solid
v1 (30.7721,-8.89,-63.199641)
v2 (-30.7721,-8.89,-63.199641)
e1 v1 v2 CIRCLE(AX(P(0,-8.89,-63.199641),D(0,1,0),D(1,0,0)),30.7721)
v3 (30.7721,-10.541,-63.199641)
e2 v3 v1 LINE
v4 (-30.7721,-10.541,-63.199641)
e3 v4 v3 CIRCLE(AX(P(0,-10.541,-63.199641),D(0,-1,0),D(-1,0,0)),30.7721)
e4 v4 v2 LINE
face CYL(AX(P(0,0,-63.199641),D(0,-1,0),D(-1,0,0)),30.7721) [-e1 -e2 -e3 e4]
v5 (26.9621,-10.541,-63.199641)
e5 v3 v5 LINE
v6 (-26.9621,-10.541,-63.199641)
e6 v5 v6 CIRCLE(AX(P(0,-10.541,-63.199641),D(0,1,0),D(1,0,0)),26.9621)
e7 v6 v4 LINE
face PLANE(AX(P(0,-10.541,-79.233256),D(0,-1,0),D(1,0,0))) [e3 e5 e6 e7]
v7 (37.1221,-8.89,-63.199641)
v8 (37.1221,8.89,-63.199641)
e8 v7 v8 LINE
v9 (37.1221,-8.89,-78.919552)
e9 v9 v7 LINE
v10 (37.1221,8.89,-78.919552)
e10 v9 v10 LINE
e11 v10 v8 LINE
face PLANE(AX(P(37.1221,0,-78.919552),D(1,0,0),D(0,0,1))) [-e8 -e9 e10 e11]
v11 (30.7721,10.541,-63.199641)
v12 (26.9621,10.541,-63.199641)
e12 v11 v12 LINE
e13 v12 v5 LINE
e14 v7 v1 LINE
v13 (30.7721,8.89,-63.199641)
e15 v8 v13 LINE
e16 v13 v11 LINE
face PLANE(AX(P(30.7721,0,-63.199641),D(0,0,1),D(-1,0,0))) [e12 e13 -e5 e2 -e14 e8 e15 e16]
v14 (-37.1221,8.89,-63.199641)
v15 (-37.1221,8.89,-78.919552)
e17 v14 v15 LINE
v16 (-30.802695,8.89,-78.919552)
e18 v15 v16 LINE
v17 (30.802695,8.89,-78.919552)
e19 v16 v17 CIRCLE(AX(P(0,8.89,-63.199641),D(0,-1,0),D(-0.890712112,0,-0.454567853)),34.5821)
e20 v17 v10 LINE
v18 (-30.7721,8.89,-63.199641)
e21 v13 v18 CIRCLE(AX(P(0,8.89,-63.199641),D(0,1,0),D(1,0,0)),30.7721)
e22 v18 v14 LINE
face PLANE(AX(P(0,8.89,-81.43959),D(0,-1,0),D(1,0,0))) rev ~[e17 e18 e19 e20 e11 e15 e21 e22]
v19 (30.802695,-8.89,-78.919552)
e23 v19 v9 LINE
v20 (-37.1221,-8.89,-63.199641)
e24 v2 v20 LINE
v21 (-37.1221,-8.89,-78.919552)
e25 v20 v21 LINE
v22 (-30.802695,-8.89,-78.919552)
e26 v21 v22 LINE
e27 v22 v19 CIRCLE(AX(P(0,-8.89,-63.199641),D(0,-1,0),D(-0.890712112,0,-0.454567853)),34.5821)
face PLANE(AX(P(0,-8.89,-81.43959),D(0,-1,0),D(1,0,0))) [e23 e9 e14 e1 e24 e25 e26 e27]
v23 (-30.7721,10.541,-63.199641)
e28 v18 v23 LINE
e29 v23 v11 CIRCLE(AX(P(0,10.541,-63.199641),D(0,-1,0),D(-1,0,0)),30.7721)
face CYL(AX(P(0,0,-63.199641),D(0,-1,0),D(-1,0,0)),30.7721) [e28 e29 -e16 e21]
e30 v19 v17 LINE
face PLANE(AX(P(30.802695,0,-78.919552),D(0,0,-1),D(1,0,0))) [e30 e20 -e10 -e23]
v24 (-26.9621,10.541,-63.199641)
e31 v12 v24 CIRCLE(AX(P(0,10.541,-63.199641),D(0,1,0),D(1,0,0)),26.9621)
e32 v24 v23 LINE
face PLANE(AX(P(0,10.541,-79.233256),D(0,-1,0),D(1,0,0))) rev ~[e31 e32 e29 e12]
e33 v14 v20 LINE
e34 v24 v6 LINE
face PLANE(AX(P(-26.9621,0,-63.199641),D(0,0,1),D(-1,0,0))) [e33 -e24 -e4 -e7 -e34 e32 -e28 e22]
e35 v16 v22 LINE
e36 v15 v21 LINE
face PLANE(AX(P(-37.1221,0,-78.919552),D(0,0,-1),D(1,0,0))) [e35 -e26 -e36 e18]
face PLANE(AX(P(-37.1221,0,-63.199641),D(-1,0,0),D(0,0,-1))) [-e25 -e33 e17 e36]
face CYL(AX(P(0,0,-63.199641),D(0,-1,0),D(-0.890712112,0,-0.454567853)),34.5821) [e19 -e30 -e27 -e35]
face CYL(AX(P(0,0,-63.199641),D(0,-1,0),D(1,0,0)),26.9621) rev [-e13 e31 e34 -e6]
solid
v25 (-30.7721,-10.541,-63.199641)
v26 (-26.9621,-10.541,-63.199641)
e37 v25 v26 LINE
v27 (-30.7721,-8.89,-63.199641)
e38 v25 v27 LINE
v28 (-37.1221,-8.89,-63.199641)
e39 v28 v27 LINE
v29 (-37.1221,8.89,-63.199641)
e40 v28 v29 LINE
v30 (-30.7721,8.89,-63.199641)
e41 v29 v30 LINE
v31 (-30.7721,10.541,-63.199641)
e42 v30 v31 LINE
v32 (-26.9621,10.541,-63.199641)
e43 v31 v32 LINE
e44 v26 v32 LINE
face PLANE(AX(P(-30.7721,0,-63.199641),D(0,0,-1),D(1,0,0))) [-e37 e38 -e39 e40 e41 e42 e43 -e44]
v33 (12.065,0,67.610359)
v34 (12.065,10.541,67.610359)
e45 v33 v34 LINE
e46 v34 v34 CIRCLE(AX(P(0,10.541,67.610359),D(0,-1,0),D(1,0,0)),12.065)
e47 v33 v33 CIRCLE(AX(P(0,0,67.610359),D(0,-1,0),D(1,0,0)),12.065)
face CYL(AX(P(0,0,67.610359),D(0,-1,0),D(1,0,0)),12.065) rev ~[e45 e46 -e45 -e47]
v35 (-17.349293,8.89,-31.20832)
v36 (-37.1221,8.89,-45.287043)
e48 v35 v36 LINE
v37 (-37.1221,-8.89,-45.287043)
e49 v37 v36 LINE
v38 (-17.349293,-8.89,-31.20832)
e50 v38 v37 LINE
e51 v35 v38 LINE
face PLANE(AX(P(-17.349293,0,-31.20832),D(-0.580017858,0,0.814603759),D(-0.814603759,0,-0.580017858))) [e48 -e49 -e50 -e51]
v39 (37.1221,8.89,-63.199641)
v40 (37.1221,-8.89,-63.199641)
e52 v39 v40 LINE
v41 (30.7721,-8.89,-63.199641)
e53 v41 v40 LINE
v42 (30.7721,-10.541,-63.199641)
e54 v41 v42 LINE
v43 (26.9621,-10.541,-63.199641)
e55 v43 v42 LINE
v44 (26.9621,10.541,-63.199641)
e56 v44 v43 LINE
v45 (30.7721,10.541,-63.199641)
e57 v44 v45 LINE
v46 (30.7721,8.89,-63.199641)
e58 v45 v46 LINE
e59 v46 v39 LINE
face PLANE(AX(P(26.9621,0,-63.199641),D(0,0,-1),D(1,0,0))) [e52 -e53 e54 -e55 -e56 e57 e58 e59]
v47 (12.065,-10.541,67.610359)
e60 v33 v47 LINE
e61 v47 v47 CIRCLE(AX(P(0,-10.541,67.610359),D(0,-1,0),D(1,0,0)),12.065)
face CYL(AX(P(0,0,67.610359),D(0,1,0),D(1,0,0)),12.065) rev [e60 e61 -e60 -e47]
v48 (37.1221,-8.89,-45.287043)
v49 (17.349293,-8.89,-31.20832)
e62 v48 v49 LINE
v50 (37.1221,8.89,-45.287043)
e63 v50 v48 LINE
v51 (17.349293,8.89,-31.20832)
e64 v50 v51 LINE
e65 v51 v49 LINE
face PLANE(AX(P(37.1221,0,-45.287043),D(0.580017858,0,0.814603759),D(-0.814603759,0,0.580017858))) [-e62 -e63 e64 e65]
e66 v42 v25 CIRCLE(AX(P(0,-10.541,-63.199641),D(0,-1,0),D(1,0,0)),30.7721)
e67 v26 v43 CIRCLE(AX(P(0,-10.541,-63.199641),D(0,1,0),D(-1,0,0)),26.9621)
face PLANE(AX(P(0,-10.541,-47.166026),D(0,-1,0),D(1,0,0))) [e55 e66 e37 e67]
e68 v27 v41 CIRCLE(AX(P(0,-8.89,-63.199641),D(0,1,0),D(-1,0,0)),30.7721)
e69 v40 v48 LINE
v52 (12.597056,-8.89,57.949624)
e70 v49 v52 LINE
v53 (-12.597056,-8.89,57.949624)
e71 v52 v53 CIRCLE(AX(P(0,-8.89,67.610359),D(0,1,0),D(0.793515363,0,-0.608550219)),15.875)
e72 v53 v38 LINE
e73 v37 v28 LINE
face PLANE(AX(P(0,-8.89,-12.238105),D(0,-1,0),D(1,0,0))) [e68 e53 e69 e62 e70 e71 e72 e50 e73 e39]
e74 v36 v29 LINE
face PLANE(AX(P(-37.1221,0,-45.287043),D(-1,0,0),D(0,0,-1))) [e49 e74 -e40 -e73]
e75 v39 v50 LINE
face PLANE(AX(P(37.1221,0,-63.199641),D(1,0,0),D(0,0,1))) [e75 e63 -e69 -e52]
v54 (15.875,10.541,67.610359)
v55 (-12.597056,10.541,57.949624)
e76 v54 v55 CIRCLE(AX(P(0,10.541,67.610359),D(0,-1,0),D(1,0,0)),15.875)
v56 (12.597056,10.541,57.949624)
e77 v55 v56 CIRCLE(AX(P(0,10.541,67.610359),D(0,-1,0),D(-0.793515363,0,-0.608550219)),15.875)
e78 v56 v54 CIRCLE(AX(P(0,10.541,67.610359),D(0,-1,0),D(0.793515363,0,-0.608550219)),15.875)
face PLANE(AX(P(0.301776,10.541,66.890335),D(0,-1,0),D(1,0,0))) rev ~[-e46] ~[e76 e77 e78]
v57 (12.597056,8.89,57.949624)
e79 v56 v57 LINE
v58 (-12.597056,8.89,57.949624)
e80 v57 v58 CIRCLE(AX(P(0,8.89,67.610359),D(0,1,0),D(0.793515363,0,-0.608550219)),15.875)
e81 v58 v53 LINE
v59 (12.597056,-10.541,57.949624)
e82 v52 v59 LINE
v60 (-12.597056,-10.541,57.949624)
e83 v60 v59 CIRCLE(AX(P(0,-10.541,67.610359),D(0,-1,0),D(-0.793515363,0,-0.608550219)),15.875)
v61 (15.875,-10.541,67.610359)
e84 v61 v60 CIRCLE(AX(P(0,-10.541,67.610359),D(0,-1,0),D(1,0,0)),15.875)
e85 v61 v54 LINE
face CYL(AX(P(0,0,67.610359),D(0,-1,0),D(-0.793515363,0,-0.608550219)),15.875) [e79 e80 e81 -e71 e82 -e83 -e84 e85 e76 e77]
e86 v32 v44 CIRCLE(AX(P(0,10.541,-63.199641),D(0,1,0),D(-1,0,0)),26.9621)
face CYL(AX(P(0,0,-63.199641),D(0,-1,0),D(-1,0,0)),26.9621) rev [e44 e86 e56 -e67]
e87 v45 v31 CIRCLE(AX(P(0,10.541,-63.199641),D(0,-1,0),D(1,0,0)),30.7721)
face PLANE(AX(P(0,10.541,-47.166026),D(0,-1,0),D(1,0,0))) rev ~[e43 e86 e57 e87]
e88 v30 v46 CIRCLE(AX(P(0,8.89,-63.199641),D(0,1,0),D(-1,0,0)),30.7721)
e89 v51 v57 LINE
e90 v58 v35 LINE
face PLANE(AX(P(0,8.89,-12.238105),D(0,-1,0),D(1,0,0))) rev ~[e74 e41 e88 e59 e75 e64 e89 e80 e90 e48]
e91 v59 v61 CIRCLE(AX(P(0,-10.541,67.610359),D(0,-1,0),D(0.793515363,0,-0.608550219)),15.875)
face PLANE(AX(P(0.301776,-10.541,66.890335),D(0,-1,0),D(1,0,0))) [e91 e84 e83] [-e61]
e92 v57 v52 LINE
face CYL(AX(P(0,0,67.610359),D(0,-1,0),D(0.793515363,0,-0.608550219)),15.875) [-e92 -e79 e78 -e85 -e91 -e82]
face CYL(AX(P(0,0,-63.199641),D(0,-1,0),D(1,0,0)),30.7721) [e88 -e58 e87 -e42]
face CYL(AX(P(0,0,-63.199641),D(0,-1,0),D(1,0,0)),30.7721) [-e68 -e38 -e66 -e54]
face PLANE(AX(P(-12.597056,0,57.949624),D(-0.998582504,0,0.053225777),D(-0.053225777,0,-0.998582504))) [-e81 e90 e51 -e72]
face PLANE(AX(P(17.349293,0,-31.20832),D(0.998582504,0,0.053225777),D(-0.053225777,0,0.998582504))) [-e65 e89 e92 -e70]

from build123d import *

# Parameters (mm, degrees)
F1_DEPTH = 10.541
F2_DEPTH = 8.89
F3_DEPTH = 10.541
F4_DEPTH = 8.89
F0_R     = 12.065
F5_DEPTH = 10.541


with BuildPart() as f1:
    # F0 (on Front) → F1 (new body, symmetric)
    with BuildSketch(Plane.XZ):
        with BuildLine():
            ThreePointArc((-26.9621, -63.1996413046), (0, -36.2375413046), (26.9621, -63.1996413046))
            Line((26.9621, -63.1996413046), (30.7721, -63.1996413046))
            ThreePointArc((30.7721, -63.1996413046), (0, -32.4275413046), (-30.7721, -63.1996413046))
            Line((-30.7721, -63.1996413046), (-26.9621, -63.1996413046))
        make_face()
    extrude(amount=F1_DEPTH, both=True)

    # F0 (on Front) → F2 (join, symmetric)
    with BuildSketch(Plane.XZ):
        with BuildLine():
            ThreePointArc((-30.7721, -63.1996413046), (0, -32.4275413046), (30.7721, -63.1996413046))
            Line((30.7721, -63.1996413046), (37.1221, -63.1996413046))
            Line((37.1221, -63.1996413046), (37.1221, -45.2870428562))
            Line((37.1221, -45.2870428562), (17.3492934555, -31.2083195895))
            Line((17.3492934555, -31.2083195895), (12.597056389, 57.9496239752))
            ThreePointArc((12.597056389, 57.9496239752), (0, 51.7353586954), (-12.597056389, 57.9496239752))
            Line((-12.597056389, 57.9496239752), (-17.3492934555, -31.2083195895))
            Line((-17.3492934555, -31.2083195895), (-37.1221, -45.2870428562))
            Line((-37.1221, -45.2870428562), (-37.1221, -63.1996413046))
            Line((-37.1221, -63.1996413046), (-30.7721, -63.1996413046))
        make_face()
    extrude(amount=F2_DEPTH, both=True)

    # F0 (on Front) → F5 (join, symmetric)
    with BuildSketch(Plane.XZ):
        with BuildLine():
            ThreePointArc((-12.597056389, 57.9496239752), (0, 51.7353586954), (12.597056389, 57.9496239752))
            ThreePointArc((12.597056389, 57.9496239752), (15.0331948563, 62.5095080396), (15.875, 67.6103586954))
            ThreePointArc((15.875, 67.6103586954), (-5.1008506558, 82.6435535517), (-12.597056389, 57.9496239752))
        make_face()
        with Locations((0, 67.6103586954)):
            Circle(F0_R, mode=Mode.SUBTRACT)
    extrude(amount=F5_DEPTH, both=True)


with BuildPart() as f3:
    # F0 (on Front) → F3 (new body, symmetric)
    with BuildSketch(Plane.XZ):
        with BuildLine():
            Line((30.7721, -63.1996413046), (26.9621, -63.1996413046))
            ThreePointArc((26.9621, -63.1996413046), (0, -90.1617413046), (-26.9621, -63.1996413046))
            Line((-26.9621, -63.1996413046), (-30.7721, -63.1996413046))
            ThreePointArc((-30.7721, -63.1996413046), (0, -93.9717413046), (30.7721, -63.1996413046))
        make_face()
    extrude(amount=F3_DEPTH, both=True)

    # F0 (on Front) → F4 (join, symmetric)
    with BuildSketch(Plane.XZ):
        with BuildLine():
            Line((37.1221, -63.1996413046), (30.7721, -63.1996413046))
            ThreePointArc((30.7721, -63.1996413046), (0, -93.9717413046), (-30.7721, -63.1996413046))
            Line((-30.7721, -63.1996413046), (-37.1221, -63.1996413046))
            Line((-37.1221, -63.1996413046), (-37.1221, -78.9195522666))
            Line((-37.1221, -78.9195522666), (-30.8026953327, -78.9195522666))
            ThreePointArc((-30.8026953327, -78.9195522666), (0, -97.7817413046), (30.8026953327, -78.9195522666))
            Line((30.8026953327, -78.9195522666), (37.1221, -78.9195522666))
            Line((37.1221, -78.9195522666), (37.1221, -63.1996413046))
        make_face()
    extrude(amount=F4_DEPTH, both=True)


solid = Compound([f1.part, f3.part])
